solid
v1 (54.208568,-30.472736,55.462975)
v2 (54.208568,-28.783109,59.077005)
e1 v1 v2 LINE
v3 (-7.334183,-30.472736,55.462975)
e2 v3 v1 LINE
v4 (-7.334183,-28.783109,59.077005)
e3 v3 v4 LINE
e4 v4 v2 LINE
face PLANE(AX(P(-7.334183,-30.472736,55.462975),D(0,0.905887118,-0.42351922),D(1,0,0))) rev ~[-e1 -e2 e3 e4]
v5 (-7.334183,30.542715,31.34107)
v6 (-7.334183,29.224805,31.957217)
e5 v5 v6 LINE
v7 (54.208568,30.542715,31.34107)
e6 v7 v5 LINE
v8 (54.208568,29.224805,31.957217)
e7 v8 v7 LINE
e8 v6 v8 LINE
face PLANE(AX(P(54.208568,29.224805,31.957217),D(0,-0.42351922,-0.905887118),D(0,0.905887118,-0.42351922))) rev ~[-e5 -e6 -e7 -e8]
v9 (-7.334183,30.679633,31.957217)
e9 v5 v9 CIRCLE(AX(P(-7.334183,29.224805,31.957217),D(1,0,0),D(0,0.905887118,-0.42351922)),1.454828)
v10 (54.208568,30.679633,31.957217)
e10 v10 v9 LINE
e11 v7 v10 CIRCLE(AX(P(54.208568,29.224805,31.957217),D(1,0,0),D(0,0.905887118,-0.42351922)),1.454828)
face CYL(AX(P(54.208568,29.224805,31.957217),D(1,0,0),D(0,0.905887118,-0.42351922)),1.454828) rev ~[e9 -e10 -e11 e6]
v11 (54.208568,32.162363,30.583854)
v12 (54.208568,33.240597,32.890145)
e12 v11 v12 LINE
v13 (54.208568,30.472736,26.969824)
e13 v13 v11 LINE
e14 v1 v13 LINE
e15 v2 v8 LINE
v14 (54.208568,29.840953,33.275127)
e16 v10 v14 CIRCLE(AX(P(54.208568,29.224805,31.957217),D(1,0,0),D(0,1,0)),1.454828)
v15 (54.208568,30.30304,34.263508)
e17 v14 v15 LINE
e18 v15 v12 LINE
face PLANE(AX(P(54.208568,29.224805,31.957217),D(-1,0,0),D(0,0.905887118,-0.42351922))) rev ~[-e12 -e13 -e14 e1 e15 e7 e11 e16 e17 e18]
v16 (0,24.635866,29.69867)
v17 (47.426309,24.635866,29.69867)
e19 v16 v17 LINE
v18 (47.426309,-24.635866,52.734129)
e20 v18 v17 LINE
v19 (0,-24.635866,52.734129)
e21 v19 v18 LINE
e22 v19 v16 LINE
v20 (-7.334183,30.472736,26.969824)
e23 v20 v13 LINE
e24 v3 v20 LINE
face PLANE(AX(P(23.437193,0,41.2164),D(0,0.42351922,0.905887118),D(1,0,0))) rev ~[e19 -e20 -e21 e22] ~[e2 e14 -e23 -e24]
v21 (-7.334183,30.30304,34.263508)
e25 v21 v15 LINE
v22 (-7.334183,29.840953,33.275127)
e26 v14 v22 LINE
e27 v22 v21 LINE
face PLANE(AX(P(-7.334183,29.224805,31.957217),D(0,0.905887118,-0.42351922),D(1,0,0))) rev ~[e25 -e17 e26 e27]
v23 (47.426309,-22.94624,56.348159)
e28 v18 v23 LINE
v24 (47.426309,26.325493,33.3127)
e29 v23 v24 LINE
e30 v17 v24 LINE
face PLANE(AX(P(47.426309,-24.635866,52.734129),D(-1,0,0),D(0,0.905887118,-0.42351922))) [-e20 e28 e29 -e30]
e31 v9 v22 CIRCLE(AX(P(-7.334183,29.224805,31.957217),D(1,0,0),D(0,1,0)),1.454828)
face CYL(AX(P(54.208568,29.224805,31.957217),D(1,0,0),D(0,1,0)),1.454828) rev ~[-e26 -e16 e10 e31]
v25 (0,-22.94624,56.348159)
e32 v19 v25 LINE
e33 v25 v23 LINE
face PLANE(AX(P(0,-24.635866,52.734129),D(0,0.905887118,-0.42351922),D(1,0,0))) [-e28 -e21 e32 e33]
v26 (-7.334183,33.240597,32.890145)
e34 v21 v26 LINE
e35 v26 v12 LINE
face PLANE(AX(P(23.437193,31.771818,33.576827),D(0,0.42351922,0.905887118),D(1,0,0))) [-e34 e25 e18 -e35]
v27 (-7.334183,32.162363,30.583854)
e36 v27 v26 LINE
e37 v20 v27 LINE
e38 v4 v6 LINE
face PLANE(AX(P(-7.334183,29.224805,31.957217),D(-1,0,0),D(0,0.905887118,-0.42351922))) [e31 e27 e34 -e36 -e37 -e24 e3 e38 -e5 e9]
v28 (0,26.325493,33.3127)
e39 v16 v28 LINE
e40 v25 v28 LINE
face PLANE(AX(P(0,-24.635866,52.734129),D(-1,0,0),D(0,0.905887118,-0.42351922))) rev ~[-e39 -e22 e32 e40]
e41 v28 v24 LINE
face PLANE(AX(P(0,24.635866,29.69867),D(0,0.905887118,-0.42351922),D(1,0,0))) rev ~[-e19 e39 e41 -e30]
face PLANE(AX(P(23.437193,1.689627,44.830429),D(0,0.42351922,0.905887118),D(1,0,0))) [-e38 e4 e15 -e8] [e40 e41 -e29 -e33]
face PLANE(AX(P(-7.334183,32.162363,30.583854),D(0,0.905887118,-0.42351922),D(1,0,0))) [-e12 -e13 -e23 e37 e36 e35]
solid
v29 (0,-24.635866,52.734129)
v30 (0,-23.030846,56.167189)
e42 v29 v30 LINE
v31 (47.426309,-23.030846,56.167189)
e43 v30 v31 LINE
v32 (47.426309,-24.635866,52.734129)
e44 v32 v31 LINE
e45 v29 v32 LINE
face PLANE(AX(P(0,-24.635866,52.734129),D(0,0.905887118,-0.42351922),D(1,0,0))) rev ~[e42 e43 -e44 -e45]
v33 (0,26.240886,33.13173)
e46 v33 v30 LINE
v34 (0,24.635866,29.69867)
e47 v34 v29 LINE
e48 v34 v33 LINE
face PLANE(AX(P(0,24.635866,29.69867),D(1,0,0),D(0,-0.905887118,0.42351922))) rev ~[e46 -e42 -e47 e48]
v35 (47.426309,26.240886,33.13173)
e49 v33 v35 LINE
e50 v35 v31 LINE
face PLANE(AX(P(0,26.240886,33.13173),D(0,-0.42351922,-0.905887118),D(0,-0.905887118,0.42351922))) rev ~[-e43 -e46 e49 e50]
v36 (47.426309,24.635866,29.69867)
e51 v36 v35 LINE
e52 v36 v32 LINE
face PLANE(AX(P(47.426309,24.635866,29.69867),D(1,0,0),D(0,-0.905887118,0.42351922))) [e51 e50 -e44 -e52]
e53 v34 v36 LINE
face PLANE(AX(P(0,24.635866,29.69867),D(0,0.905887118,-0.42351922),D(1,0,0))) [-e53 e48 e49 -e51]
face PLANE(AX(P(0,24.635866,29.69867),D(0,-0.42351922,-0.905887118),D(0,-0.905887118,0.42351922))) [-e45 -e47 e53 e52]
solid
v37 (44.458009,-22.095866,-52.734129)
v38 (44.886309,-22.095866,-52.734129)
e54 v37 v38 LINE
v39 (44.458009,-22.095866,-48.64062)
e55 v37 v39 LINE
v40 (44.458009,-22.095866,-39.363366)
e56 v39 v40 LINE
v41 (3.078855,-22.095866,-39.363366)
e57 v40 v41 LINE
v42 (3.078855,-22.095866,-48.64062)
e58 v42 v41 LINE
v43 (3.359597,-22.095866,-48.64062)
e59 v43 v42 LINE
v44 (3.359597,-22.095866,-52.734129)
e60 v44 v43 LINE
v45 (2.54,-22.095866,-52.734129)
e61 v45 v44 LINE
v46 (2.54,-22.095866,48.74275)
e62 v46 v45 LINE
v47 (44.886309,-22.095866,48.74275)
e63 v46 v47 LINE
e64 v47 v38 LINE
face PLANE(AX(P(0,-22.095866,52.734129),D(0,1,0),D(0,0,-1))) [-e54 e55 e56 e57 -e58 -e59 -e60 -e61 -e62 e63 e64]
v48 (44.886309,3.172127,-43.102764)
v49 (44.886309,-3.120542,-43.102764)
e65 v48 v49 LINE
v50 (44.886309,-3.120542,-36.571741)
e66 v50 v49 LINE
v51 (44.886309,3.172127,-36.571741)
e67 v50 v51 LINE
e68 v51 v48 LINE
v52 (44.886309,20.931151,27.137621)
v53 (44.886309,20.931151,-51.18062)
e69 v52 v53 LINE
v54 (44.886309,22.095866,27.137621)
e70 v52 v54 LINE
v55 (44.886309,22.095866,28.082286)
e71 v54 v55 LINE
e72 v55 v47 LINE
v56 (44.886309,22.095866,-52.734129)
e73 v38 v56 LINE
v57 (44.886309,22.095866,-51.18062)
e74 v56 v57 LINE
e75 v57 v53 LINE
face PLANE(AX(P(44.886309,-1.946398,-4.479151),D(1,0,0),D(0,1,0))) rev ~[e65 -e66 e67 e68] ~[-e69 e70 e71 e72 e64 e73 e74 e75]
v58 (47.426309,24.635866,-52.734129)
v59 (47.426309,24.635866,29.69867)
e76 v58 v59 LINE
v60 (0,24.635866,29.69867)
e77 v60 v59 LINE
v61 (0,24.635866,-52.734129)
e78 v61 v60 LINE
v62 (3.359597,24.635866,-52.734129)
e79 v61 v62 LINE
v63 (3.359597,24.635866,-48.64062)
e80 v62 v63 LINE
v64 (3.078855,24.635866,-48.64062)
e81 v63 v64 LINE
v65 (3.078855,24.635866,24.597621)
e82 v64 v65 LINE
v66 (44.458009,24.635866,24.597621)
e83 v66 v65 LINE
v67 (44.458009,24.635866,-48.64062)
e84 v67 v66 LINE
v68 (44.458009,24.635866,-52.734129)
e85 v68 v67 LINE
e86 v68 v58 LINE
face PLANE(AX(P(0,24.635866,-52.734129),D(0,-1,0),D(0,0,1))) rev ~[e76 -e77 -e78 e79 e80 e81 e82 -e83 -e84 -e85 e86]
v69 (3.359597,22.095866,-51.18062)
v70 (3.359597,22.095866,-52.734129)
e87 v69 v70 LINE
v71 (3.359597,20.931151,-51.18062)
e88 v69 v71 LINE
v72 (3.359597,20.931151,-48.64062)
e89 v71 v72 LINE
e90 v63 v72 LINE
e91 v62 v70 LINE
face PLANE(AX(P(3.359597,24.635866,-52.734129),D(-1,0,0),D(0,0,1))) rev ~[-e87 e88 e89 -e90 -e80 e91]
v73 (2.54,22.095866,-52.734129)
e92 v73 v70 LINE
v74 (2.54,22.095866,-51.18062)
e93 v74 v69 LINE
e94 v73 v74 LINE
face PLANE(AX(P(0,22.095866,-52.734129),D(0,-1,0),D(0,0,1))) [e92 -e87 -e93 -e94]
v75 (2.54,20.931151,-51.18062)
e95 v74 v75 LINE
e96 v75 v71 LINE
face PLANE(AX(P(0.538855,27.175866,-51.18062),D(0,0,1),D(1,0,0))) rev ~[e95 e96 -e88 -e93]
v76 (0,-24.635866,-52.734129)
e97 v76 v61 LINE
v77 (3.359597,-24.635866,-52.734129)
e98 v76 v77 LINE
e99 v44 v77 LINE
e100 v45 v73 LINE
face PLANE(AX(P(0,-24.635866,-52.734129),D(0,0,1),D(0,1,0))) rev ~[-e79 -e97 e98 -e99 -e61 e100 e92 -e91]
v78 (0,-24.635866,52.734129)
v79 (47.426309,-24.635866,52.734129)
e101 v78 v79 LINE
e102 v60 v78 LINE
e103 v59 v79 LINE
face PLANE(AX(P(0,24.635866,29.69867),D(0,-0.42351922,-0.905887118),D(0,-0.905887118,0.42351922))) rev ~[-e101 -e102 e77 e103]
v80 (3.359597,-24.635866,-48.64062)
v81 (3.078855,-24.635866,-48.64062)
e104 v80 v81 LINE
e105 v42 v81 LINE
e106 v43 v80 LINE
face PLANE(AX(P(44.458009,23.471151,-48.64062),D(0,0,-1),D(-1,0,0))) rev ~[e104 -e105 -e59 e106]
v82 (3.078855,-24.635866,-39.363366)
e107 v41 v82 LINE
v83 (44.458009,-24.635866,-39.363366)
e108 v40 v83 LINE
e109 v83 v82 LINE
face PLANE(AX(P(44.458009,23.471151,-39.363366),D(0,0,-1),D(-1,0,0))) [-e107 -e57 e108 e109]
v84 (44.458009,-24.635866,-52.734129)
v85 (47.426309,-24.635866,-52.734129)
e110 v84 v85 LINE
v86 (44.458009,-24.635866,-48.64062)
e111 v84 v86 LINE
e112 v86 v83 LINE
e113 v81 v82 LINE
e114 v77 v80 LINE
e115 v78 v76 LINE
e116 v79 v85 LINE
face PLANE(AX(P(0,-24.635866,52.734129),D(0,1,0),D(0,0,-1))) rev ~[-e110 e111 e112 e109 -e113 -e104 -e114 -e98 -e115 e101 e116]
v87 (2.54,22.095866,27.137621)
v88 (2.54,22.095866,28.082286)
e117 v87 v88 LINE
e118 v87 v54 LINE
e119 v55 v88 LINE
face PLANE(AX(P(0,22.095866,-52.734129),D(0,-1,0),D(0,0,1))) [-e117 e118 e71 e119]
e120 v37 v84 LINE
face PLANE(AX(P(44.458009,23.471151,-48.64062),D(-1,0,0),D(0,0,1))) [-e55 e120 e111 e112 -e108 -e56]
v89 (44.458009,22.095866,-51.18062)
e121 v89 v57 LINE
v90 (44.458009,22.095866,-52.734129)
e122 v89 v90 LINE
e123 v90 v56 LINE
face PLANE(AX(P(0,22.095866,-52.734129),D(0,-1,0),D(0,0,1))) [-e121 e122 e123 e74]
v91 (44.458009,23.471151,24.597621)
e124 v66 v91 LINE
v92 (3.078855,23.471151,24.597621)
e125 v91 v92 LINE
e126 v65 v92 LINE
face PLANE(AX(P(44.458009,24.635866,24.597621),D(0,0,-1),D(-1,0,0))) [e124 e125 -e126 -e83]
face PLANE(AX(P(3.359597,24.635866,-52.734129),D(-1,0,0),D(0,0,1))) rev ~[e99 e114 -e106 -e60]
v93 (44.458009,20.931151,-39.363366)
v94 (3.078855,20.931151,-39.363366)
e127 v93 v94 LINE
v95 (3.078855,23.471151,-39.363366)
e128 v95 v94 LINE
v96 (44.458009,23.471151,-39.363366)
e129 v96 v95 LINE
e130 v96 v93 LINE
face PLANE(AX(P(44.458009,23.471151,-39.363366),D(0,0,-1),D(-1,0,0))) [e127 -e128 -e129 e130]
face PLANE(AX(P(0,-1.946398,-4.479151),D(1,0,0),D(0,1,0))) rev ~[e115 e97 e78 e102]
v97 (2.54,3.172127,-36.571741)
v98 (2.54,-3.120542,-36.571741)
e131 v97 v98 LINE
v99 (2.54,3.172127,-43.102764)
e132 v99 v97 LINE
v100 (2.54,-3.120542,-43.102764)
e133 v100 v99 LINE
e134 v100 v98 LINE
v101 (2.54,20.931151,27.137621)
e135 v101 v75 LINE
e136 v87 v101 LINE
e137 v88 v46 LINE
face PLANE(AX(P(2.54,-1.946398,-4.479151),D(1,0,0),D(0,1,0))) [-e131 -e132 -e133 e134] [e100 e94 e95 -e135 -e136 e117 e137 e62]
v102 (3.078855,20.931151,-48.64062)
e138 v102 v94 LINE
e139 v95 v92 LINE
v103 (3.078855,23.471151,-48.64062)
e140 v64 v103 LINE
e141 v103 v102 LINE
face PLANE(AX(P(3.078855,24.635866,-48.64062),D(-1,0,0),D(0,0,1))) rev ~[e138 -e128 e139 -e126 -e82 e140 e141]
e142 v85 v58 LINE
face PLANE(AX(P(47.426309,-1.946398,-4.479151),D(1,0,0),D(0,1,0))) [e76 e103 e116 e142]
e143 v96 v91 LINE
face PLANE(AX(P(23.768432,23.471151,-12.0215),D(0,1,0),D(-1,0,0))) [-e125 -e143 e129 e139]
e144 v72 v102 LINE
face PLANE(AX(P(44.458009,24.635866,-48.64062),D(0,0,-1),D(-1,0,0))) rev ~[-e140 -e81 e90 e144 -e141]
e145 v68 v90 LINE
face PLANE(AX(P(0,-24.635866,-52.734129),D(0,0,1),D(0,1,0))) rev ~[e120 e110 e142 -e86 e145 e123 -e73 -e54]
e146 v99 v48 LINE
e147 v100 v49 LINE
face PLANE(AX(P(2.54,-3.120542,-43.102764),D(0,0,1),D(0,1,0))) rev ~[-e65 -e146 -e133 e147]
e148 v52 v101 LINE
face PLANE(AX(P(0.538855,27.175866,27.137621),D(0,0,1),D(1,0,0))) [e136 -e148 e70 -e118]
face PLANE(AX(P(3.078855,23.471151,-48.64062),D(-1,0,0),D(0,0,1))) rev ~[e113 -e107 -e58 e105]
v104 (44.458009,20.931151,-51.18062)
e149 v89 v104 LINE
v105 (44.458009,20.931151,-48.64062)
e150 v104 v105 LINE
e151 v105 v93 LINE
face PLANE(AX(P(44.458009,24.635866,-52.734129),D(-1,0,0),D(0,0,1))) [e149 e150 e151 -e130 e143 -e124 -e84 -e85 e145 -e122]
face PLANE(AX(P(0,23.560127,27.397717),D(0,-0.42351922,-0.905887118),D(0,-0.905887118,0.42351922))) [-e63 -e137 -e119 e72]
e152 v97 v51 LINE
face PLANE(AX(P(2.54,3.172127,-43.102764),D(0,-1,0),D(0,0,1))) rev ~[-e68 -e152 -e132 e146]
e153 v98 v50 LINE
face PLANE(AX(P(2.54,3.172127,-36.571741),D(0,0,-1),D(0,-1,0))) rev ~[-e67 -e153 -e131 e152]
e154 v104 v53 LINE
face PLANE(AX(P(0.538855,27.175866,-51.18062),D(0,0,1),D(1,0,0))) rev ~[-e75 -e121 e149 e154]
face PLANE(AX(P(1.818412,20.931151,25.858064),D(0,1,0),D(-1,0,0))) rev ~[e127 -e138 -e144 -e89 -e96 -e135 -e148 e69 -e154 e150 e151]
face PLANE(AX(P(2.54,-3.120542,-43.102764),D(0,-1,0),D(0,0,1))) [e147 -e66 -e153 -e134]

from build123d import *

# Parameters (mm, degrees)
F1_DEPTH    = 47.4263094366
F2_W        = 61.5427512676
F2_H        = 67.2771147457
F2_W_2      = 47.4263094366
F2_H_2      = 54.3905875297
F3_DEPTH    = 3.989492543
F4_DEPTH    = 3.7897219881
F5_W        = 61.5427512676
F5_H        = 3.2427412463
F6_DEPTH    = 2.5458927266
F7_W        = 41.3791541941
F7_H        = 73.2382405549
F8_DEPTH    = 1.1647148058
F9_T        = 2.54
F9_T3_DEPTH = 6.2447148058
F9_T5_DEPTH = 78.3182405549
F9_T7_DEPTH = 46.4591541941
F10_W       = 41.3791541941
F10_H       = 9.277254343
F11_DEPTH   = 51.4699444175
F12_W       = 41.0984121263
F12_H       = 4.0935091674
F13_DEPTH   = 56.4465969801
F14_W       = 3.1205418054
F14_H       = 6.5310224891
F14_W_2     = 3.1721270643
F15_DEPTH   = 43.8657402992
F16_W       = 39.7140569985
F16_H       = 81.2445171177
F17_DEPTH   = 10
F19_DEPTH   = 80.7498022914


# Not quite as in the source:
# - a shell that OpenCascade refuses in one call is made with other operations: the cavity is built on its own and cut out


with BuildPart() as f1:
    # F0 (on Right) → F1 (new body)
    with BuildSketch(Plane.YZ):
        Polygon((24.6358662844, 29.6986699104), (-24.6358662844, 52.7341291308), (-24.6358662844, -52.7341291308), (24.6358662844, -52.7341291308), align=None)
    extrude(amount=F1_DEPTH)


with BuildPart() as f3:
    # F2 (on face) → F3 (new body)
    with BuildSketch(Plane(origin=(0, 15.8131088069, 33.8234745294), x_dir=(1, 0, 0), z_dir=(0, 0.4235192203, 0.9058871177))):
        with Locations((23.4371926636, -17.4559373872)):
            Rectangle(F2_W, F2_H)
        with Locations((23.7131547183, -17.4559373872)):
            Rectangle(F2_W_2, F2_H_2, mode=Mode.SUBTRACT)
    extrude(amount=F3_DEPTH)

    # F5 (on face) → F6 (join)
    with BuildSketch(Plane(origin=(0, 17.502735578, 37.4375044304), x_dir=(1, 0, 0), z_dir=(0, 0.4235192203, 0.9058871177))):
        with Locations((23.4371926636, 14.5612493625)):
            Rectangle(F5_W, F5_H)
    extrude(amount=F6_DEPTH)

    # F18 (on face) → F19 (cut)
    with BuildSketch(Plane.YZ.offset(54.2085682973)):
        with BuildLine():
            Line((29.224805033, 31.9572170763), (30.5427146714, 31.3410695989))
            ThreePointArc((30.5427146714, 31.3410695989), (30.6449907476, 31.6416286341), (30.6796326959, 31.9572170763))
            ThreePointArc((30.6796326959, 31.9572170763), (30.4521827099, 32.7382852981), (29.8409525104, 33.2751267147))
            Line((29.8409525104, 33.2751267147), (29.224805033, 31.9572170763))
        make_face()
    extrude(amount=-F19_DEPTH, mode=Mode.SUBTRACT)


with BuildPart() as f4:
    # F4 (new): a face of the model
    f4_faces = [f1.part.faces().sort_by_distance(p)[0] for p in [
        (23.7131547183, 0, 41.2163995206),
    ]]
    extrude(f4_faces, amount=F4_DEPTH)


with BuildPart() as f1_1:
    add(f1.part)

    # F7 (on face) → F8 (cut)
    with BuildSketch(Plane(origin=(0, 24.6358662844, 0), x_dir=(-1, 0, 0), z_dir=(0, 1, 0))):
        with Locations((-23.7684322055, -12.0214996859)):
            Rectangle(F7_W, F7_H)
    extrude(amount=-F8_DEPTH, mode=Mode.SUBTRACT)

    # F9: shell of thickness 2.54, made by hand


with BuildPart() as f9_core1:
    # F9_t2: copy of F1
    add(f1_1.part)

    # the walls: a layer under each face that stays
    f9_faces = [f9_core1.faces().sort_by_distance(p)[0] for p in [
        (23.7131547183, 0, 41.2163995206),
        (45.8454324553, 24.6358662844, -49.9863691628),
        (23.7131547183, -24.6358662844, 0),
        (0, 0, 0),
        (47.4263094366, 0, 0),
        (3.0788551085, 24.0535088815, -12.0214996859),
        (23.7684322055, 24.0535088815, -48.6406199634),
        (44.4580093026, 24.0535088815, -12.0214996859),
        (23.7684322055, 24.0535088815, 24.5976205915),
        (23.7684322055, 23.4711514786, -12.0214996859),
    ]]
    thicken(f9_faces, amount=-F9_T, mode=Mode.SUBTRACT)

    # F9_s4 → F9_t3 (cut)
    with BuildSketch(Plane.XZ.offset(-27.1758662844)):
        Polygon((3.1042551085, -48.6152199634), (0.5388551085, -48.6406199634), (0.5388551085, -51.1806199634), (3.0788551085, -51.1806199634), align=None)
        Polygon((3.1042551085, 24.5722205915), (0.5388551085, 24.5976205915), (0.5388551085, 27.1376205915), (3.0788551085, 27.1376205915), align=None)
        Polygon((44.4326093026, -48.6152199634), (44.4580093026, -51.1806199634), (46.9980093026, -51.1806199634), (46.9980093026, -48.6406199634), align=None)
        Polygon((44.4326093026, 24.5722205915), (46.9980093026, 24.5976205915), (46.9980093026, 27.1376205915), (44.4580093026, 27.1376205915), align=None)
    extrude(amount=F9_T3_DEPTH, mode=Mode.SUBTRACT)

    # F9_s6 → F9_t5 (cut)
    with BuildSketch(Plane.XY.offset(-51.1806199634)):
        Polygon((3.1042551085, 23.4965514786), (0.5388551085, 23.4711514786), (0.5388551085, 20.9311514786), (3.0788551085, 20.9311514786), align=None)
        Polygon((44.4326093026, 23.4965514786), (46.9980093026, 23.4711514786), (46.9980093026, 20.9311514786), (44.4580093026, 20.9311514786), align=None)
    extrude(amount=F9_T5_DEPTH, mode=Mode.SUBTRACT)

    # F9_s8 → F9_t7 (cut)
    with BuildSketch(Plane.YZ.offset(0.5388551085)):
        Polygon((23.4965514786, -48.6152199634), (23.4711514786, -51.1806199634), (20.9311514786, -51.1806199634), (20.9311514786, -48.6406199634), align=None)
        Polygon((23.4965514786, 24.5722205915), (23.4711514786, 27.1376205915), (20.9311514786, 27.1376205915), (20.9311514786, 24.5976205915), align=None)
    extrude(amount=F9_T7_DEPTH, mode=Mode.SUBTRACT)


with BuildPart() as f1_2:
    add(f1_1.part)

    # what is left inside the walls is the cavity
    f9_cavity = [f9_core1.part.solids().sort_by_distance(p)[0] for p in [
        (30.770873, -22.070466, -1.99569),
    ]]
    add(f9_cavity, mode=Mode.SUBTRACT)

    # F10 (on face) → F11 (cut)
    with BuildSketch(Plane(origin=(0, 23.4711514786, 0), x_dir=(-1, 0, 0), z_dir=(0, 1, 0))):
        with Locations((-23.7684322055, -44.0019927919)):
            Rectangle(F10_W, F10_H)
    extrude(amount=-F11_DEPTH, mode=Mode.SUBTRACT)

    # F12 (on face) → F13 (cut)
    with BuildSketch(Plane(origin=(0, 24.6358662844, 0), x_dir=(-1, 0, 0), z_dir=(0, 1, 0))):
        with Locations((-23.9088032395, -50.6873745471)):
            Rectangle(F12_W, F12_H)
    extrude(amount=-F13_DEPTH, mode=Mode.SUBTRACT)

    # F14 (on face) → F15 (join)
    with BuildSketch(Plane.YZ.offset(2.54)):
        with Locations((-1.5602709027, -39.8372523487)):
            Rectangle(F14_W, F14_H)
        with Locations((1.5860635322, -39.8372523487)):
            Rectangle(F14_W_2, F14_H)
    extrude(amount=F15_DEPTH)

    # F16 (on face) → F17 (cut)
    with BuildSketch(Plane.XZ.offset(24.6358662844)):
        with Locations((22.683288902, 4.934841767)):
            Rectangle(F16_W, F16_H)
    extrude(amount=F17_DEPTH, mode=Mode.SUBTRACT)


solid = Compound([f3.part, f4.part, f1_2.part])
